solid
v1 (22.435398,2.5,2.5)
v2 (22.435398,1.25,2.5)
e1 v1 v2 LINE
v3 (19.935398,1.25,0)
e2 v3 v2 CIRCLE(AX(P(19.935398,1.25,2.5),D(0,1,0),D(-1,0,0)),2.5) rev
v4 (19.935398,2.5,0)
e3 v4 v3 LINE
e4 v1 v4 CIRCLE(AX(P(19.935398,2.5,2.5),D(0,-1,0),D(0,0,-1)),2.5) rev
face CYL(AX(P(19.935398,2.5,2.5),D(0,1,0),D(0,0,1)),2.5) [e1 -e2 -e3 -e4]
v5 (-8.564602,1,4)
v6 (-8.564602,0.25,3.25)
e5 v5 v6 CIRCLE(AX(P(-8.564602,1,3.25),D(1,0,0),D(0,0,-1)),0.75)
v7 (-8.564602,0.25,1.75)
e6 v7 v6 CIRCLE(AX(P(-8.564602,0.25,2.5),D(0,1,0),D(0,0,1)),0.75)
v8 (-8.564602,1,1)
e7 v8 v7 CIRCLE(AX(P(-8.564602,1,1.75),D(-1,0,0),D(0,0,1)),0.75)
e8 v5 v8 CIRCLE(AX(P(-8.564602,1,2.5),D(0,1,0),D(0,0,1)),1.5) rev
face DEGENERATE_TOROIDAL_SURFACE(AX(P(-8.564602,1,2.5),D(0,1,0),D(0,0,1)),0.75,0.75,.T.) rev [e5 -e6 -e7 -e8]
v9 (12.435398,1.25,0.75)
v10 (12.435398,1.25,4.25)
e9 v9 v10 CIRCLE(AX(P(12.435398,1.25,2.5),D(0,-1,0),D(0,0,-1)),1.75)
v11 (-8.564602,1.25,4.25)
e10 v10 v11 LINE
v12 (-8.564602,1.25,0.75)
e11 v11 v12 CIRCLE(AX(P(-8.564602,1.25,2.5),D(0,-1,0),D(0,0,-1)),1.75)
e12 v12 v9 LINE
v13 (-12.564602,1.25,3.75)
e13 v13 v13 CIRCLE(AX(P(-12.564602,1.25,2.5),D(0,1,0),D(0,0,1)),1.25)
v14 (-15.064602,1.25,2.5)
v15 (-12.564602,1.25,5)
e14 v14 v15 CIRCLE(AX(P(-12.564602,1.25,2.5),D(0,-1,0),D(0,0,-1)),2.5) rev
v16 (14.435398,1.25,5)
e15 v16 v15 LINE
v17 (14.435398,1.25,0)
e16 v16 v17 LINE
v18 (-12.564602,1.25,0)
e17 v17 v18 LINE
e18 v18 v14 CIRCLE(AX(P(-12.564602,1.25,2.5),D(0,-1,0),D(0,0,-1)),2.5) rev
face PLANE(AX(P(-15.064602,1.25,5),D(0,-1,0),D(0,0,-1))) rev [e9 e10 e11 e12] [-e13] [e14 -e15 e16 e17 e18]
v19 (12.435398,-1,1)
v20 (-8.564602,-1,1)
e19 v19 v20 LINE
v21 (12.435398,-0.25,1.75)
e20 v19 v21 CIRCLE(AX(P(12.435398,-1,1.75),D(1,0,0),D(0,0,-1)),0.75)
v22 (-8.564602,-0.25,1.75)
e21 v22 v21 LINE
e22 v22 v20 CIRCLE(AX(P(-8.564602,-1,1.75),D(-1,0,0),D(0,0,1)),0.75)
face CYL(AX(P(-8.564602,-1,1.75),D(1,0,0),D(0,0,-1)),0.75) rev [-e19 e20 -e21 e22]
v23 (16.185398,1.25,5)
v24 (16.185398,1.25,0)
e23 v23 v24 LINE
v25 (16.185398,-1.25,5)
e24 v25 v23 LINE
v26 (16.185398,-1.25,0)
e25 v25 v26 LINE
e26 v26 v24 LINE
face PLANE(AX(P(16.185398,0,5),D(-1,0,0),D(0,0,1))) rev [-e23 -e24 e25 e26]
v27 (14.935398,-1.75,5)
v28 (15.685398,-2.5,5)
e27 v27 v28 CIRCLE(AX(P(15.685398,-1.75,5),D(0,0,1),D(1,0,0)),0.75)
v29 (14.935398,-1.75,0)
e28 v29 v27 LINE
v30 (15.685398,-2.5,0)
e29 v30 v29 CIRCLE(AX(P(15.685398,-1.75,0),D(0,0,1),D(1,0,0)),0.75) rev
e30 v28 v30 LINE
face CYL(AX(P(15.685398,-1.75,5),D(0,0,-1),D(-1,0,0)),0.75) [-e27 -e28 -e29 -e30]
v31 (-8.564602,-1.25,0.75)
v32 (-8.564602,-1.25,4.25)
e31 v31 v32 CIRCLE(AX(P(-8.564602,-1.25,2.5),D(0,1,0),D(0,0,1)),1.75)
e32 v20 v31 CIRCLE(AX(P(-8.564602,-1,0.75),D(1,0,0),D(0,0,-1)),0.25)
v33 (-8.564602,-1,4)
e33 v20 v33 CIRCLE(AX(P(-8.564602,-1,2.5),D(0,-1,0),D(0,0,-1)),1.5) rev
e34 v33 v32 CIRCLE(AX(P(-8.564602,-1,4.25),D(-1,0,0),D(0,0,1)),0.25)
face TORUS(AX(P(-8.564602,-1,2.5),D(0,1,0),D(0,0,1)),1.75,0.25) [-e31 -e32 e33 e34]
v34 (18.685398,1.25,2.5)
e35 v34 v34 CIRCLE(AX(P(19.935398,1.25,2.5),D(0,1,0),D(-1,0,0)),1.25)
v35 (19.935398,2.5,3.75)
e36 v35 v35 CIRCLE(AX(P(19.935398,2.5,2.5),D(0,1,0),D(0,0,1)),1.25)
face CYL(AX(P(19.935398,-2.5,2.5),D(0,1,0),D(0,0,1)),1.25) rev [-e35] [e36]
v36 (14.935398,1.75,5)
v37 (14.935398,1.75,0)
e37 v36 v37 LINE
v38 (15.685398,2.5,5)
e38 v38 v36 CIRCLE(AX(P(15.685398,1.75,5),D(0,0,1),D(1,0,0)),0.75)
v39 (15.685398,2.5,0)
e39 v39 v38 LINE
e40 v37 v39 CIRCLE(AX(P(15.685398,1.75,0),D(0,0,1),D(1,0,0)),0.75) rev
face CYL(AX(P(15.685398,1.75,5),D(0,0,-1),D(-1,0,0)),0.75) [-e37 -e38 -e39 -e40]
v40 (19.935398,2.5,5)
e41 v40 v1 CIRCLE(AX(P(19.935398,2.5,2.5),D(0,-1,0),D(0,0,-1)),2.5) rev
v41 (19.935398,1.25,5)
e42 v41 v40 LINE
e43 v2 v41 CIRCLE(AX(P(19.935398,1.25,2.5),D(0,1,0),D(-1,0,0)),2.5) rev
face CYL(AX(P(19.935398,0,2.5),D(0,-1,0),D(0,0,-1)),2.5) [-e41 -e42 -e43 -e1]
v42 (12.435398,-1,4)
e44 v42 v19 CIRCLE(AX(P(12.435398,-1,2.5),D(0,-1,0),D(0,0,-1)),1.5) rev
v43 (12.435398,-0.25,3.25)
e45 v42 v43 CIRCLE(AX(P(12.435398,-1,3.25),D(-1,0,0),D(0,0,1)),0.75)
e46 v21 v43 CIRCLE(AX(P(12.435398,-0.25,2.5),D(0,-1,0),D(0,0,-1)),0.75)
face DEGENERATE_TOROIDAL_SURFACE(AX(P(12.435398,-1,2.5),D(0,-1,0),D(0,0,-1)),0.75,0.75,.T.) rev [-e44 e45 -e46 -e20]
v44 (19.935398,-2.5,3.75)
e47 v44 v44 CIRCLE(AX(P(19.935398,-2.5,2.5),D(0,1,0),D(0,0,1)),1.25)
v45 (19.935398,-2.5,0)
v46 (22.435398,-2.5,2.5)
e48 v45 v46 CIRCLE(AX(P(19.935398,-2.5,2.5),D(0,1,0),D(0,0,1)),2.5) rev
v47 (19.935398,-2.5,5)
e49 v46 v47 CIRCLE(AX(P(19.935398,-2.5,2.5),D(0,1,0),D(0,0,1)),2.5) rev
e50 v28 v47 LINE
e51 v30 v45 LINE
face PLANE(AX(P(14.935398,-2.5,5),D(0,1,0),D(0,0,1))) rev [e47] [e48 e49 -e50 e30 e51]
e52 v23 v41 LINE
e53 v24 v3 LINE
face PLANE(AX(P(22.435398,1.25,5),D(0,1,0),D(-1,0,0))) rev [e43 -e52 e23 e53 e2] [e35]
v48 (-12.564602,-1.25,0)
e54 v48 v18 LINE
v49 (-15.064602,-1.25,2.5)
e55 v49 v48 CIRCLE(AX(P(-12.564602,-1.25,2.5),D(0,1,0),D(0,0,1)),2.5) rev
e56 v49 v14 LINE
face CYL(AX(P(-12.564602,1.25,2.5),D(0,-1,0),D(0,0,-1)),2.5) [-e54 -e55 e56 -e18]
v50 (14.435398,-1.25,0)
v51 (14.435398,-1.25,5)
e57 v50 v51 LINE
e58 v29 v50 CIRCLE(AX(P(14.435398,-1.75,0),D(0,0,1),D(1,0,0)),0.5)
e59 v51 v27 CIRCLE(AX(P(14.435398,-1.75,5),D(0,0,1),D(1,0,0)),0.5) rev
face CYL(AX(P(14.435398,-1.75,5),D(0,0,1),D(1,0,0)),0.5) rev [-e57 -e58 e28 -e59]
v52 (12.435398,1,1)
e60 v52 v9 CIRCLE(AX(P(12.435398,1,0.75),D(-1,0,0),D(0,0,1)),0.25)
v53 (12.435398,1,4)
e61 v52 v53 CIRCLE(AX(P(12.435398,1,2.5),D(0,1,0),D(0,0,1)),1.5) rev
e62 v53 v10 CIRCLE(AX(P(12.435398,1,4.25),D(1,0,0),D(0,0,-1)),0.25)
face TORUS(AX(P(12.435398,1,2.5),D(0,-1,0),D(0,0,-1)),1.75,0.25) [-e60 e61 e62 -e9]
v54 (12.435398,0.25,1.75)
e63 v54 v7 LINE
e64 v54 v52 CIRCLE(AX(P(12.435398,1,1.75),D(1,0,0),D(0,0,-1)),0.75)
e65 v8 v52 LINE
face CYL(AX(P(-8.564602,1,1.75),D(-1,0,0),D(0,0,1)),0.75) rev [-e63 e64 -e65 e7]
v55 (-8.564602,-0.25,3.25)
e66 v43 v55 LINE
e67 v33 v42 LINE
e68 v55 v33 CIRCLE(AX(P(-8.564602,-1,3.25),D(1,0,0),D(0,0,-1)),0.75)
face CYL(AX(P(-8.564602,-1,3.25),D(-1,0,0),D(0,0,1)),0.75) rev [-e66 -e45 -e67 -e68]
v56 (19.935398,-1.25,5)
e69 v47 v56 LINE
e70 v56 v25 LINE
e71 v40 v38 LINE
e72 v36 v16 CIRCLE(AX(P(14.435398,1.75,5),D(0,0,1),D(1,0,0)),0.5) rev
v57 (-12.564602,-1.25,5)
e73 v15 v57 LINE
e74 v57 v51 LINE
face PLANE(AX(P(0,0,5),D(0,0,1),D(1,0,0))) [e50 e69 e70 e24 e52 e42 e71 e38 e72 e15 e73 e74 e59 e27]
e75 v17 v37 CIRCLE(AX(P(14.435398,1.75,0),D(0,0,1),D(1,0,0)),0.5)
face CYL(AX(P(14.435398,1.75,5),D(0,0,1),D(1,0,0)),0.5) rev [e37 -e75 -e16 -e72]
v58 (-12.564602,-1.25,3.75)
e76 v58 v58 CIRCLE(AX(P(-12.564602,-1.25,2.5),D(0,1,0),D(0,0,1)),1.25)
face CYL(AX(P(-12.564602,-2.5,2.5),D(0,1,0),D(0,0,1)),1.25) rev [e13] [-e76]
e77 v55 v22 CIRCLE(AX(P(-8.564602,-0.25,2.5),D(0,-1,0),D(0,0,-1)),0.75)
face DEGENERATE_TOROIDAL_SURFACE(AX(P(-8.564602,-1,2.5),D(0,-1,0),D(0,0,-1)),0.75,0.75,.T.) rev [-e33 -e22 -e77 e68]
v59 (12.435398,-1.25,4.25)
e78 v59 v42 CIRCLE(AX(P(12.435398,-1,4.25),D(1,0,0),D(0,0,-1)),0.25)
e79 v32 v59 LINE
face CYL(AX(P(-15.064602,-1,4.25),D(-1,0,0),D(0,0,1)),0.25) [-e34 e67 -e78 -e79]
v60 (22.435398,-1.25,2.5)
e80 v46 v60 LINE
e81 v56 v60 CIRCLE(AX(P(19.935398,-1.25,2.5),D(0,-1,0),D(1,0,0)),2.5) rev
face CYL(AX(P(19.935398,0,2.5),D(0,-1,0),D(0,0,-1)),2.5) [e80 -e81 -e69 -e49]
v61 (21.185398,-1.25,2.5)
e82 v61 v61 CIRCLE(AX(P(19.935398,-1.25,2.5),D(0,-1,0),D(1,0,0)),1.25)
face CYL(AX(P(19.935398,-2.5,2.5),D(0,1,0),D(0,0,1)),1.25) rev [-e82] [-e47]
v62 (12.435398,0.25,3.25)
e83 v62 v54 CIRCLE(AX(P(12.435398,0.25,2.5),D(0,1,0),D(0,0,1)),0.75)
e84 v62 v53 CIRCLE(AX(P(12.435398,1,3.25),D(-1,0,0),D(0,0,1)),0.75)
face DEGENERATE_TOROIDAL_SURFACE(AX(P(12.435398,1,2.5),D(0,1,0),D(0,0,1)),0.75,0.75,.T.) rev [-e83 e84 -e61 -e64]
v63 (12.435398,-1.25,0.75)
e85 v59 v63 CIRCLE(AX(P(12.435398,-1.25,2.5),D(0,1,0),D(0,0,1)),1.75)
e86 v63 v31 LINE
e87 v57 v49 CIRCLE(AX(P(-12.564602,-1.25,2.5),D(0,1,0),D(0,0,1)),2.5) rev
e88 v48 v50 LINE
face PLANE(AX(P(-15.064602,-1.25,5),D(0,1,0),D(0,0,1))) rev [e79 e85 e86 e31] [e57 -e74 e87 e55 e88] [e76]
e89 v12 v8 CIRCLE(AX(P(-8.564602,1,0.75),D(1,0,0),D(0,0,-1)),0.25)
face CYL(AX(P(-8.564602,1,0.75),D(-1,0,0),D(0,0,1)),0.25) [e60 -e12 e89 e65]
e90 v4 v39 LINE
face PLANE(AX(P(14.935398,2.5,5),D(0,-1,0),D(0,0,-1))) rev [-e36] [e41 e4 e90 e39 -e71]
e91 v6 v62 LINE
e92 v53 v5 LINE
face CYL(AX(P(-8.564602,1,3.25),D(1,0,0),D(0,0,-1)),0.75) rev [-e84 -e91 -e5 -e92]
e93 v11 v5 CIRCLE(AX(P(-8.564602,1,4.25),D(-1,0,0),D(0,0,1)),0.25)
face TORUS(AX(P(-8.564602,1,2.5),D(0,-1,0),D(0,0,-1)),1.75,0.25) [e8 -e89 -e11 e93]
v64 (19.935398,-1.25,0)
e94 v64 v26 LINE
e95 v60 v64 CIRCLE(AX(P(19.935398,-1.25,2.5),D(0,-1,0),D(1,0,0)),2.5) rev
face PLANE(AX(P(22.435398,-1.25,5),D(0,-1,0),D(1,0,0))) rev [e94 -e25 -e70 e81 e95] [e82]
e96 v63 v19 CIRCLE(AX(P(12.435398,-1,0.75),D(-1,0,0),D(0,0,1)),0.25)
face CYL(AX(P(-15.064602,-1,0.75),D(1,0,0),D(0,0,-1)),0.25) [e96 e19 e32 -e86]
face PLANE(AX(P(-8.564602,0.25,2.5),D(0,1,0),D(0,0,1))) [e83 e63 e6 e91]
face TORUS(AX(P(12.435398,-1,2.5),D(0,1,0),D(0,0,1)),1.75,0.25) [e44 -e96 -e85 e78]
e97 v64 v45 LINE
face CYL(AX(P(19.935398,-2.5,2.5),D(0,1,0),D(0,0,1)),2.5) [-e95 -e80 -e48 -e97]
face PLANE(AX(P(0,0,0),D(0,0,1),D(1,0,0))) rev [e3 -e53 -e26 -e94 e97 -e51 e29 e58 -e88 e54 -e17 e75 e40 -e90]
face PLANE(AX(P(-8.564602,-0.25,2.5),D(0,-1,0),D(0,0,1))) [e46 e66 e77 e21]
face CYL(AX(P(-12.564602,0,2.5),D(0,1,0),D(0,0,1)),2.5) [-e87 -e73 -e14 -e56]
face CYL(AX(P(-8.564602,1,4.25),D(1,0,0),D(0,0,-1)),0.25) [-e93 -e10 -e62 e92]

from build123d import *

# Parameters (mm, degrees)
BOSS_EXTRUDE1_DEPTH = 5
FILLET8_R           = 2.5
SKETCH5_R           = 1.25
CUT_EXTRUDE4_DEPTH  = 24.289688565
SKETCH6_R           = 1.25
CUT_EXTRUDE5_DEPTH  = 24.523330833
FILLET9_R           = 0.75
FILLET10_R          = 0.5
SKETCH7_R           = 1.25
CUT_EXTRUDE6_DEPTH  = 1
FILLET11_R          = 0.75
FILLET12_R          = 0.25


with BuildPart() as part:
    # Sketch1 → Boss-Extrude1 (new body)
    with BuildSketch(Plane.XY):
        Polygon((-15.064601776, 1.25), (-15.064601776, -1.25), (14.935398224, -1.25), (14.935398224, -2.5), (22.435398224, -2.5), (22.435398224, -1.25), (16.185398224, -1.25), (16.185398224, 0), (16.185398224, 1.25), (22.435398224, 1.25), (22.435398224, 2.5), (14.935398224, 2.5), (14.935398224, 1.25), align=None)
    extrude(amount=BOSS_EXTRUDE1_DEPTH)

    # Fillet8
    fillet8_edges = [part.edges().sort_by_distance(p)[0] for p in [
        (22.435398224, -1.875, 5),
        (22.435398224, -1.875, 0),
        (22.435398224, 1.875, 0),
        (22.435398224, 1.875, 5),
        (-15.064601776, 0, 0),
        (-15.064601776, 0, 5),
    ]]
    fillet(fillet8_edges, radius=FILLET8_R - 0.0001)  # a hair under: the kernel refuses the full size

    # Sketch5 → Cut-Extrude4 (cut, through all)
    with BuildSketch(Plane(origin=(0, 1.25, 0), x_dir=(1, 0, 0), z_dir=(0, 1, 0))):
        with Locations(Location((-12.564601776, -2.5, 0), (0, 0, 270))):
            Circle(SKETCH5_R)
    extrude(amount=-CUT_EXTRUDE4_DEPTH, mode=Mode.SUBTRACT)

    # Sketch6 → Cut-Extrude5 (cut, through all)
    with BuildSketch(Plane(origin=(0, 2.5, 0), x_dir=(1, 0, 0), z_dir=(0, 1, 0))):
        with Locations(Location((19.935398224, -2.5, 0), (0, 0, 270))):
            Circle(SKETCH6_R)
    extrude(amount=-CUT_EXTRUDE5_DEPTH, mode=Mode.SUBTRACT)

    # Fillet9
    fillet9_edges = [part.edges().sort_by_distance(p)[0] for p in [
        (14.935398224, 2.5, 2.5),
        (14.935398224, -2.5, 2.5),
    ]]
    fillet(fillet9_edges, radius=FILLET9_R)

    # Fillet10
    fillet10_edges = [part.edges().sort_by_distance(p)[0] for p in [
        (14.935398224, -1.25, 2.5),
        (14.935398224, 1.25, 2.5),
    ]]
    fillet(fillet10_edges, radius=FILLET10_R - 0.0001)  # a hair under: the kernel refuses the full size

    # Sketch7 → Cut-Extrude6 (cut)
    with BuildSketch(Plane(origin=(0, 1.25, 0), x_dir=(1, 0, 0), z_dir=(0, 1, 0))):
        with Locations(Location((-12.564601776, -2.5, 0), (0, 0, 270))):
            Circle(SKETCH7_R)
        with BuildLine():
            Line((-8.564601776, -1), (12.435398224, -1))
            ThreePointArc((12.435398224, -1), (13.935398224, -2.5), (12.435398224, -4))
            Line((12.435398224, -4), (-8.564601776, -4))
            ThreePointArc((-8.564601776, -4), (-10.064601776, -2.5), (-8.564601776, -1))
        make_face()
    cut_extrude6 = extrude(amount=-CUT_EXTRUDE6_DEPTH, mode=Mode.SUBTRACT)

    # Mirror2: Cut-Extrude6 across plane
    add(cut_extrude6.mirror(Plane.ZX), mode=Mode.SUBTRACT)

    # Fillet11
    fillet11_edges = [part.edges().sort_by_distance(p)[0] for p in [
        (-10.064601776, 0.25, 2.5),
        (1.935398224, 0.25, 1),
        (13.935398224, 0.25, 2.5),
        (1.935398224, 0.25, 4),
        (-10.064601776, -0.25, 2.5),
        (1.935398224, -0.25, 4),
        (13.935398224, -0.25, 2.5),
        (1.935398224, -0.25, 1),
    ]]
    fillet(fillet11_edges, radius=FILLET11_R)

    # Fillet12
    fillet12_edges = [part.edges().sort_by_distance(p)[0] for p in [
        (1.935398224, -1.25, 1),
        (13.935398224, -1.25, 2.5),
        (1.935398224, -1.25, 4),
        (1.935398224, 1.25, 1),
        (13.935398224, 1.25, 2.5),
        (1.935398224, 1.25, 4),
        (-10.064601776, -1.25, 2.5),
        (-10.064601776, 1.25, 2.5),
    ]]
    fillet(fillet12_edges, radius=FILLET12_R - 0.0001)  # a hair under: the kernel refuses the full size


solid = part.part
